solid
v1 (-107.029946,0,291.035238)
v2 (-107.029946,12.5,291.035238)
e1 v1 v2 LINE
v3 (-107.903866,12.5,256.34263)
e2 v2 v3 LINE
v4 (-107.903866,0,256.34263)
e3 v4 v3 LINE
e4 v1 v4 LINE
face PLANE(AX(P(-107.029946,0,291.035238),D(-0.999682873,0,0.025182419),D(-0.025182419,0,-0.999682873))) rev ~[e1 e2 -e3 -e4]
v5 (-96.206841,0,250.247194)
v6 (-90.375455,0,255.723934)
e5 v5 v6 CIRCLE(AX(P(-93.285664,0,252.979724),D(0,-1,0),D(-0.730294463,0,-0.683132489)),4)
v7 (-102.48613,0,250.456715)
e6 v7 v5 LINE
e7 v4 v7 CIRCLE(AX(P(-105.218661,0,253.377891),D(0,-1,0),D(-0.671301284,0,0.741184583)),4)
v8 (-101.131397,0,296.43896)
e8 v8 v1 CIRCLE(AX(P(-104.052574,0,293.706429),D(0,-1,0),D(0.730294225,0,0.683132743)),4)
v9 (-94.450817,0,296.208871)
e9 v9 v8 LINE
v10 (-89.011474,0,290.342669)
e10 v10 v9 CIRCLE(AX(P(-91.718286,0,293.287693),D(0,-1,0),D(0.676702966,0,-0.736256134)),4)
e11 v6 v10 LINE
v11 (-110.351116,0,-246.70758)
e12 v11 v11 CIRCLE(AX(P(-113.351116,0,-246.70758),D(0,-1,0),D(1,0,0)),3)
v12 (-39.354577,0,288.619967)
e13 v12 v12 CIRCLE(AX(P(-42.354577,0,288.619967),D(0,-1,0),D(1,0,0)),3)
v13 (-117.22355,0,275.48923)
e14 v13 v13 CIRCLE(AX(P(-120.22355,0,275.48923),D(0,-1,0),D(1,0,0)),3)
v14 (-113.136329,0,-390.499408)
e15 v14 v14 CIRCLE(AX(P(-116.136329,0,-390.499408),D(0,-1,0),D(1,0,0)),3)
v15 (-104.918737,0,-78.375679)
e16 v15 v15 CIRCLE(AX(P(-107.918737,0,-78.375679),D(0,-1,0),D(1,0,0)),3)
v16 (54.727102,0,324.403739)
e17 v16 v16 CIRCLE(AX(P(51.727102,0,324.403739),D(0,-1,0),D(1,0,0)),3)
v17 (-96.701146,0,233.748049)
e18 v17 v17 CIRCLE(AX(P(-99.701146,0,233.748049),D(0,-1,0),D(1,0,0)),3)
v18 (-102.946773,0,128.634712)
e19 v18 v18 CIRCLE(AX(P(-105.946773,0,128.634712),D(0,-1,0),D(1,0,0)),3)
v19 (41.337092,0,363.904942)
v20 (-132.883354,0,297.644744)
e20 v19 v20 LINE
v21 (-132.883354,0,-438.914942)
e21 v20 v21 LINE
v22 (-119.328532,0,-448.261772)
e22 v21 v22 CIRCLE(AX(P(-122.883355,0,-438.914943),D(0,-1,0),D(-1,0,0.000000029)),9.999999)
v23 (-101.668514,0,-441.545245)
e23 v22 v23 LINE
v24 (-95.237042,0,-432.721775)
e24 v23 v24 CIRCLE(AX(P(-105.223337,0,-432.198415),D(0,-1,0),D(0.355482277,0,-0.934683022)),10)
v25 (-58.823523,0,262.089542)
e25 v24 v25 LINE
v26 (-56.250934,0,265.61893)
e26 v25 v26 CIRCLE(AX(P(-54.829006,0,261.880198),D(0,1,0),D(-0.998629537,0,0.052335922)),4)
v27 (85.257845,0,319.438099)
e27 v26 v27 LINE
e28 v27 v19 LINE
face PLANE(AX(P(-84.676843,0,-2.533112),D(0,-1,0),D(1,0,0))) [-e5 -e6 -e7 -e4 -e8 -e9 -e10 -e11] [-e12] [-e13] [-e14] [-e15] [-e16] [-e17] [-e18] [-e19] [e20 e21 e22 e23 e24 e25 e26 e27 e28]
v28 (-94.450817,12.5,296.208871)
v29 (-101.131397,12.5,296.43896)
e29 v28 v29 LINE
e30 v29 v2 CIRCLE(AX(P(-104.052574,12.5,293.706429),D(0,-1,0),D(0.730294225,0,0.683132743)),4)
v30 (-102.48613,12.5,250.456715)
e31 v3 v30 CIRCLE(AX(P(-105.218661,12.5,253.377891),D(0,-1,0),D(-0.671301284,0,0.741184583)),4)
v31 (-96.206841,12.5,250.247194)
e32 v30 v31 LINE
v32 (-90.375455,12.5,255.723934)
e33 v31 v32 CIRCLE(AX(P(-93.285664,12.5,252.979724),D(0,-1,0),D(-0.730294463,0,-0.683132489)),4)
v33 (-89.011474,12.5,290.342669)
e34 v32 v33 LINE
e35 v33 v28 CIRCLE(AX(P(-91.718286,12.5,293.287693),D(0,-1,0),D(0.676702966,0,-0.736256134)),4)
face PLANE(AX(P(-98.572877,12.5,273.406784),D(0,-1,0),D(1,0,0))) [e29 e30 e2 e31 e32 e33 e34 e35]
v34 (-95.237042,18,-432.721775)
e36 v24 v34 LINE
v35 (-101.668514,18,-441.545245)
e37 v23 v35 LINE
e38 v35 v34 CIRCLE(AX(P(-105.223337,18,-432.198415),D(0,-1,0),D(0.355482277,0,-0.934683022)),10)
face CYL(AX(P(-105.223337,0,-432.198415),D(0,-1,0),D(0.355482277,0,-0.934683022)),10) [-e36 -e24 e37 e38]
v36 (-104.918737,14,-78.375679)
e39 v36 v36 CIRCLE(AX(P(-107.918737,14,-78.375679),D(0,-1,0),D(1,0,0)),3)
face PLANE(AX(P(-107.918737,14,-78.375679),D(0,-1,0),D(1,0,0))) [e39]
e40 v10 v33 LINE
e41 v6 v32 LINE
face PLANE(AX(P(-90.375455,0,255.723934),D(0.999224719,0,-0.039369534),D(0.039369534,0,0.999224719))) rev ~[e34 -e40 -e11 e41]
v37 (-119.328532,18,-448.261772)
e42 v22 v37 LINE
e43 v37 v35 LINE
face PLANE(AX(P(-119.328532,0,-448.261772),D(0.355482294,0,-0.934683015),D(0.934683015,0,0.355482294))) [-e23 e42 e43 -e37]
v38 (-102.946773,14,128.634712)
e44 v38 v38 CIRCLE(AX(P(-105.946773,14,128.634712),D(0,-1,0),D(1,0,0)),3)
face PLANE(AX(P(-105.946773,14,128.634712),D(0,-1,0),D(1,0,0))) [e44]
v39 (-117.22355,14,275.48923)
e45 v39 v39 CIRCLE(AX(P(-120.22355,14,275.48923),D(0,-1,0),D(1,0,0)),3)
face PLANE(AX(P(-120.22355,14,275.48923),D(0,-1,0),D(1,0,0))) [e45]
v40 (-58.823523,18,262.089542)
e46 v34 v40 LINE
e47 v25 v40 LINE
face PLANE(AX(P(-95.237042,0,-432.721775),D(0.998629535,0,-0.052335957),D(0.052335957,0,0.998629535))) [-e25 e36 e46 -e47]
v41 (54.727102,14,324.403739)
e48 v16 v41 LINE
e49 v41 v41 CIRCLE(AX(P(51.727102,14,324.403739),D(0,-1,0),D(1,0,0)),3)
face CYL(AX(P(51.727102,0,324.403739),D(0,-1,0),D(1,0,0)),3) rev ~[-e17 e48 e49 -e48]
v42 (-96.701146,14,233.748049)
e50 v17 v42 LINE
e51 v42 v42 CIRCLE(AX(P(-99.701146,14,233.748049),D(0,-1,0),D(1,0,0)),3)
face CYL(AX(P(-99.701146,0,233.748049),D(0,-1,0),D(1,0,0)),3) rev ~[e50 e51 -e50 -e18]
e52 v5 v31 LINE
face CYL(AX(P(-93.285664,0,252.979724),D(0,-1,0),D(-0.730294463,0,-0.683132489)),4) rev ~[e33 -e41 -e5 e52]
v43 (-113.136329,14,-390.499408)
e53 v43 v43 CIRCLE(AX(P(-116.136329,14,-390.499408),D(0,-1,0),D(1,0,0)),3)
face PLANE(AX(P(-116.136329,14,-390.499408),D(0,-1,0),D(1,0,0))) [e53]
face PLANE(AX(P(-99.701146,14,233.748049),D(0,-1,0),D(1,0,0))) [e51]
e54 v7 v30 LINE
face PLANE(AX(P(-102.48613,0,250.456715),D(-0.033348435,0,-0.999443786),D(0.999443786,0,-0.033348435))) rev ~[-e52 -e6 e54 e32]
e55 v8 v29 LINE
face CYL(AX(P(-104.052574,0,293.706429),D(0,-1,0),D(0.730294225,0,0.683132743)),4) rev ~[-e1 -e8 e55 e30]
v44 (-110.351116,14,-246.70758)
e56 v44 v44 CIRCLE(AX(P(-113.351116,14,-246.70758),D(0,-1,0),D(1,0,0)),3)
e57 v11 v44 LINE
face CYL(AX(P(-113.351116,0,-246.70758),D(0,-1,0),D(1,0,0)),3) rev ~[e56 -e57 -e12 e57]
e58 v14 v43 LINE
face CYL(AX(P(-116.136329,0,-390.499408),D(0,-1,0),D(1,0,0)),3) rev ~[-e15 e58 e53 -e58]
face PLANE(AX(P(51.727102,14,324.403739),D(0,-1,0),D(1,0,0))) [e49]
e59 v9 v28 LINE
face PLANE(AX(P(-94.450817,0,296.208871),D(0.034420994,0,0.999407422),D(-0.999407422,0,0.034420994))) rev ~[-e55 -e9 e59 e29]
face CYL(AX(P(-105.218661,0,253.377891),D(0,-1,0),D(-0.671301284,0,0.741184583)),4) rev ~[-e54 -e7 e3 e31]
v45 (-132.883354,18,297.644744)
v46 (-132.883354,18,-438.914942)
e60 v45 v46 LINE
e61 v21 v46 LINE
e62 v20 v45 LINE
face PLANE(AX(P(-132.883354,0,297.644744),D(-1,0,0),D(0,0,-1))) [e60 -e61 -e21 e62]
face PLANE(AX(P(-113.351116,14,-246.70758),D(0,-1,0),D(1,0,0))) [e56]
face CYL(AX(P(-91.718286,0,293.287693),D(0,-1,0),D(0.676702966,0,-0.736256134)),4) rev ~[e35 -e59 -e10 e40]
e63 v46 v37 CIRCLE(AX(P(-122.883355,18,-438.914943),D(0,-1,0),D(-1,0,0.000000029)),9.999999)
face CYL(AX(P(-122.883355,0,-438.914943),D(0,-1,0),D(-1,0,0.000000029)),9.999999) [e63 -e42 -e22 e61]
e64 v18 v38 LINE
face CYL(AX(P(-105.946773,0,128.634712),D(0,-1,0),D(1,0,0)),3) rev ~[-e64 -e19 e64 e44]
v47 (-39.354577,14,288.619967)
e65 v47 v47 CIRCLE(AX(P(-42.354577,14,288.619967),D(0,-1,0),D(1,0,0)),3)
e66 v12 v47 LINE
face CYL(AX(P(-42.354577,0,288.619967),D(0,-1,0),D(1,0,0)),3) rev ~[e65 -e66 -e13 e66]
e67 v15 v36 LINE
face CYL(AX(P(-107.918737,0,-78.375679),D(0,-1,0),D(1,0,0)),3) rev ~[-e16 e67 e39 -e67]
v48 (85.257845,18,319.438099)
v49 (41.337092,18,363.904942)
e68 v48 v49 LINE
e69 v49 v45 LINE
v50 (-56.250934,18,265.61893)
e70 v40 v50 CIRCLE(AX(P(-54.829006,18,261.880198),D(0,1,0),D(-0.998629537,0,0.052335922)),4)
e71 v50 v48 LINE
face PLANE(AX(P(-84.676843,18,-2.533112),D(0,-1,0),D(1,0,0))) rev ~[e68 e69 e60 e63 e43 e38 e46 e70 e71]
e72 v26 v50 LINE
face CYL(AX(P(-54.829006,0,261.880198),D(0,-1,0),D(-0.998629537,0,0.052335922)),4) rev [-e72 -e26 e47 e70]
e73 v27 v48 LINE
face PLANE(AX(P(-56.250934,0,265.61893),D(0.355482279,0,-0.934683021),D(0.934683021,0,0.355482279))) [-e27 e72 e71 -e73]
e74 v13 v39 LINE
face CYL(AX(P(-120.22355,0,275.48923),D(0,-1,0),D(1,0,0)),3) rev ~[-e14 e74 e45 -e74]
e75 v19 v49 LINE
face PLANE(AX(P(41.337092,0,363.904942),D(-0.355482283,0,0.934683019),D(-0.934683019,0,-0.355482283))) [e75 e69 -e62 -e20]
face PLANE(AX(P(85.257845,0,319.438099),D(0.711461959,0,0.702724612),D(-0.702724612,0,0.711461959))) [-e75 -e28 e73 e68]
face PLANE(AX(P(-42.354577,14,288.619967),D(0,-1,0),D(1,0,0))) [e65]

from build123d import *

# Parameters (mm, degrees)
F0_R     = 3
F1_DEPTH = 18
F2_DEPTH = 14
F3_DEPTH = 12.5


# Not quite as in the source:
# - ends of sketch curves that miss each other by under 0.0002 mm in the source are joined


with BuildPart() as f1:
    # F0 (on Front) → F1 (new body)
    with BuildSketch(Plane.XZ):
        with BuildLine():
            Line((-119.3285324557, -448.2617723394), (-101.6685144557, -441.5452453394))
            ThreePointArc((-101.6685144557, -441.5452453394), (-97.1422559669, -438.0887567531), (-95.2370421293, -432.7217753041))
            Line((-95.2370421293, -432.7217753041), (-58.8235234557, 262.0895416606))
            ThreePointArc((-58.8235234557, 262.0895416606), (-58.06143799, 264.2363343101), (-56.250934498, 265.6189297718))
            Line((-56.250934498, 265.6189297718), (85.2578445443, 319.4380986606))
            Line((85.2578445443, 319.4380986606), (41.3370915443, 363.9049416606))
            Line((41.3370915443, 363.9049416606), (-132.8833544557, 297.6447436606))
            Line((-132.8833544557, 297.6447436606), (-132.8833544557, -438.9149423394))
            ThreePointArc((-132.8833544557, -438.9149423394), (-128.5601395631, -447.1474456551), (-119.3285324557, -448.2617723394))
        make_face()
        with Locations((-116.1363294557, -390.4994083394)):
            Circle(F0_R, mode=Mode.SUBTRACT)
        with Locations((-113.3511164557, -246.7075803394)):
            Circle(F0_R, mode=Mode.SUBTRACT)
        with Locations((-107.9187374557, -78.3756793394)):
            Circle(F0_R, mode=Mode.SUBTRACT)
        with Locations((-105.9467734557, 128.6347116606)):
            Circle(F0_R, mode=Mode.SUBTRACT)
        with Locations((-99.7011464557, 233.7480486606)):
            Circle(F0_R, mode=Mode.SUBTRACT)
        with Locations((-120.2235504557, 275.4892296606)):
            Circle(F0_R, mode=Mode.SUBTRACT)
        with BuildLine():
            ThreePointArc((-90.3754553764, 255.7239337355), (-90.5472879726, 250.0640248228), (-96.2068413545, 250.2471937553))
            Line((-96.2068413545, 250.2471937553), (-102.4861304557, 250.4567146606))
            ThreePointArc((-102.4861304557, 250.4567146606), (-108.1617141765, 250.6689360163), (-107.9038666822, 256.3426299107))
            Line((-107.9038666822, 256.3426299107), (-107.0299454557, 291.0352376606))
            ThreePointArc((-107.0299454557, 291.0352376606), (-106.7545815371, 296.6558621202), (-101.1313975225, 296.4389595982))
            Line((-101.1313975225, 296.4389595982), (-94.4508164557, 296.2088706606))
            ThreePointArc((-94.4508164557, 296.2088706606), (-88.7851572097, 296.0073908544), (-89.0114747479, 290.3426689785))
            Line((-89.0114747479, 290.3426689785), (-90.3754553764, 255.7239337355))
        make_face(mode=Mode.SUBTRACT)
        with Locations((-42.3545774557, 288.6199666606)):
            Circle(F0_R, mode=Mode.SUBTRACT)
        with Locations((51.7271015443, 324.4037386606)):
            Circle(F0_R, mode=Mode.SUBTRACT)
        with Locations((-116.1363294557, -390.4994083394)):
            Circle(F0_R)
        with Locations((-113.3511164557, -246.7075803394)):
            Circle(F0_R)
        with Locations((-107.9187374557, -78.3756793394)):
            Circle(F0_R)
        with Locations((-105.9467734557, 128.6347116606)):
            Circle(F0_R)
        with Locations((-120.2235504557, 275.4892296606)):
            Circle(F0_R)
        with Locations((-99.7011464557, 233.7480486606)):
            Circle(F0_R)
        with Locations((-42.3545774557, 288.6199666606)):
            Circle(F0_R)
        with Locations((51.7271015443, 324.4037386606)):
            Circle(F0_R)
        with BuildLine():
            Line((-102.4861304557, 250.4567146606), (-96.2068414557, 250.2471936606))
            ThreePointArc((-96.2068414557, 250.2471936606), (-90.5472879726, 250.0640248228), (-90.3754553764, 255.7239337355))
            Line((-90.3754553764, 255.7239337355), (-89.0114744557, 290.3426686606))
            ThreePointArc((-89.0114744557, 290.3426686606), (-88.7851572097, 296.0073908544), (-94.4508168599, 296.2088710928))
            Line((-94.4508168599, 296.2088710928), (-101.1313974557, 296.4389596606))
            ThreePointArc((-101.1313974557, 296.4389596606), (-106.7545815371, 296.6558621202), (-107.0299455087, 291.0352376131))
            Line((-107.0299455087, 291.0352376131), (-107.9038664557, 256.3426296606))
            ThreePointArc((-107.9038664557, 256.3426296606), (-108.1617141765, 250.6689360163), (-102.4861304557, 250.4567146606))
        make_face()
    extrude(amount=-F1_DEPTH)

    # F0 (on Front) → F2 (cut)
    with BuildSketch(Plane.XZ):
        with Locations((-116.1363294557, -390.4994083394)):
            Circle(F0_R)
        with Locations((-113.3511164557, -246.7075803394)):
            Circle(F0_R)
        with Locations((-107.9187374557, -78.3756793394)):
            Circle(F0_R)
        with Locations((-105.9467734557, 128.6347116606)):
            Circle(F0_R)
        with Locations((-120.2235504557, 275.4892296606)):
            Circle(F0_R)
        with Locations((-99.7011464557, 233.7480486606)):
            Circle(F0_R)
        with Locations((-42.3545774557, 288.6199666606)):
            Circle(F0_R)
        with Locations((51.7271015443, 324.4037386606)):
            Circle(F0_R)
    extrude(amount=-F2_DEPTH, mode=Mode.SUBTRACT)

    # F0 (on Front) → F3 (cut)
    with BuildSketch(Plane.XZ):
        with BuildLine():
            Line((-102.4861304557, 250.4567146606), (-96.2068414557, 250.2471936606))
            ThreePointArc((-96.2068414557, 250.2471936606), (-90.5472879726, 250.0640248228), (-90.3754553764, 255.7239337355))
            Line((-90.3754553764, 255.7239337355), (-89.0114744557, 290.3426686606))
            ThreePointArc((-89.0114744557, 290.3426686606), (-88.7851572097, 296.0073908544), (-94.4508168599, 296.2088710928))
            Line((-94.4508168599, 296.2088710928), (-101.1313974557, 296.4389596606))
            ThreePointArc((-101.1313974557, 296.4389596606), (-106.7545815371, 296.6558621202), (-107.0299455087, 291.0352376131))
            Line((-107.0299455087, 291.0352376131), (-107.9038664557, 256.3426296606))
            ThreePointArc((-107.9038664557, 256.3426296606), (-108.1617141765, 250.6689360163), (-102.4861304557, 250.4567146606))
        make_face()
    extrude(amount=-F3_DEPTH, mode=Mode.SUBTRACT)


solid = f1.part
